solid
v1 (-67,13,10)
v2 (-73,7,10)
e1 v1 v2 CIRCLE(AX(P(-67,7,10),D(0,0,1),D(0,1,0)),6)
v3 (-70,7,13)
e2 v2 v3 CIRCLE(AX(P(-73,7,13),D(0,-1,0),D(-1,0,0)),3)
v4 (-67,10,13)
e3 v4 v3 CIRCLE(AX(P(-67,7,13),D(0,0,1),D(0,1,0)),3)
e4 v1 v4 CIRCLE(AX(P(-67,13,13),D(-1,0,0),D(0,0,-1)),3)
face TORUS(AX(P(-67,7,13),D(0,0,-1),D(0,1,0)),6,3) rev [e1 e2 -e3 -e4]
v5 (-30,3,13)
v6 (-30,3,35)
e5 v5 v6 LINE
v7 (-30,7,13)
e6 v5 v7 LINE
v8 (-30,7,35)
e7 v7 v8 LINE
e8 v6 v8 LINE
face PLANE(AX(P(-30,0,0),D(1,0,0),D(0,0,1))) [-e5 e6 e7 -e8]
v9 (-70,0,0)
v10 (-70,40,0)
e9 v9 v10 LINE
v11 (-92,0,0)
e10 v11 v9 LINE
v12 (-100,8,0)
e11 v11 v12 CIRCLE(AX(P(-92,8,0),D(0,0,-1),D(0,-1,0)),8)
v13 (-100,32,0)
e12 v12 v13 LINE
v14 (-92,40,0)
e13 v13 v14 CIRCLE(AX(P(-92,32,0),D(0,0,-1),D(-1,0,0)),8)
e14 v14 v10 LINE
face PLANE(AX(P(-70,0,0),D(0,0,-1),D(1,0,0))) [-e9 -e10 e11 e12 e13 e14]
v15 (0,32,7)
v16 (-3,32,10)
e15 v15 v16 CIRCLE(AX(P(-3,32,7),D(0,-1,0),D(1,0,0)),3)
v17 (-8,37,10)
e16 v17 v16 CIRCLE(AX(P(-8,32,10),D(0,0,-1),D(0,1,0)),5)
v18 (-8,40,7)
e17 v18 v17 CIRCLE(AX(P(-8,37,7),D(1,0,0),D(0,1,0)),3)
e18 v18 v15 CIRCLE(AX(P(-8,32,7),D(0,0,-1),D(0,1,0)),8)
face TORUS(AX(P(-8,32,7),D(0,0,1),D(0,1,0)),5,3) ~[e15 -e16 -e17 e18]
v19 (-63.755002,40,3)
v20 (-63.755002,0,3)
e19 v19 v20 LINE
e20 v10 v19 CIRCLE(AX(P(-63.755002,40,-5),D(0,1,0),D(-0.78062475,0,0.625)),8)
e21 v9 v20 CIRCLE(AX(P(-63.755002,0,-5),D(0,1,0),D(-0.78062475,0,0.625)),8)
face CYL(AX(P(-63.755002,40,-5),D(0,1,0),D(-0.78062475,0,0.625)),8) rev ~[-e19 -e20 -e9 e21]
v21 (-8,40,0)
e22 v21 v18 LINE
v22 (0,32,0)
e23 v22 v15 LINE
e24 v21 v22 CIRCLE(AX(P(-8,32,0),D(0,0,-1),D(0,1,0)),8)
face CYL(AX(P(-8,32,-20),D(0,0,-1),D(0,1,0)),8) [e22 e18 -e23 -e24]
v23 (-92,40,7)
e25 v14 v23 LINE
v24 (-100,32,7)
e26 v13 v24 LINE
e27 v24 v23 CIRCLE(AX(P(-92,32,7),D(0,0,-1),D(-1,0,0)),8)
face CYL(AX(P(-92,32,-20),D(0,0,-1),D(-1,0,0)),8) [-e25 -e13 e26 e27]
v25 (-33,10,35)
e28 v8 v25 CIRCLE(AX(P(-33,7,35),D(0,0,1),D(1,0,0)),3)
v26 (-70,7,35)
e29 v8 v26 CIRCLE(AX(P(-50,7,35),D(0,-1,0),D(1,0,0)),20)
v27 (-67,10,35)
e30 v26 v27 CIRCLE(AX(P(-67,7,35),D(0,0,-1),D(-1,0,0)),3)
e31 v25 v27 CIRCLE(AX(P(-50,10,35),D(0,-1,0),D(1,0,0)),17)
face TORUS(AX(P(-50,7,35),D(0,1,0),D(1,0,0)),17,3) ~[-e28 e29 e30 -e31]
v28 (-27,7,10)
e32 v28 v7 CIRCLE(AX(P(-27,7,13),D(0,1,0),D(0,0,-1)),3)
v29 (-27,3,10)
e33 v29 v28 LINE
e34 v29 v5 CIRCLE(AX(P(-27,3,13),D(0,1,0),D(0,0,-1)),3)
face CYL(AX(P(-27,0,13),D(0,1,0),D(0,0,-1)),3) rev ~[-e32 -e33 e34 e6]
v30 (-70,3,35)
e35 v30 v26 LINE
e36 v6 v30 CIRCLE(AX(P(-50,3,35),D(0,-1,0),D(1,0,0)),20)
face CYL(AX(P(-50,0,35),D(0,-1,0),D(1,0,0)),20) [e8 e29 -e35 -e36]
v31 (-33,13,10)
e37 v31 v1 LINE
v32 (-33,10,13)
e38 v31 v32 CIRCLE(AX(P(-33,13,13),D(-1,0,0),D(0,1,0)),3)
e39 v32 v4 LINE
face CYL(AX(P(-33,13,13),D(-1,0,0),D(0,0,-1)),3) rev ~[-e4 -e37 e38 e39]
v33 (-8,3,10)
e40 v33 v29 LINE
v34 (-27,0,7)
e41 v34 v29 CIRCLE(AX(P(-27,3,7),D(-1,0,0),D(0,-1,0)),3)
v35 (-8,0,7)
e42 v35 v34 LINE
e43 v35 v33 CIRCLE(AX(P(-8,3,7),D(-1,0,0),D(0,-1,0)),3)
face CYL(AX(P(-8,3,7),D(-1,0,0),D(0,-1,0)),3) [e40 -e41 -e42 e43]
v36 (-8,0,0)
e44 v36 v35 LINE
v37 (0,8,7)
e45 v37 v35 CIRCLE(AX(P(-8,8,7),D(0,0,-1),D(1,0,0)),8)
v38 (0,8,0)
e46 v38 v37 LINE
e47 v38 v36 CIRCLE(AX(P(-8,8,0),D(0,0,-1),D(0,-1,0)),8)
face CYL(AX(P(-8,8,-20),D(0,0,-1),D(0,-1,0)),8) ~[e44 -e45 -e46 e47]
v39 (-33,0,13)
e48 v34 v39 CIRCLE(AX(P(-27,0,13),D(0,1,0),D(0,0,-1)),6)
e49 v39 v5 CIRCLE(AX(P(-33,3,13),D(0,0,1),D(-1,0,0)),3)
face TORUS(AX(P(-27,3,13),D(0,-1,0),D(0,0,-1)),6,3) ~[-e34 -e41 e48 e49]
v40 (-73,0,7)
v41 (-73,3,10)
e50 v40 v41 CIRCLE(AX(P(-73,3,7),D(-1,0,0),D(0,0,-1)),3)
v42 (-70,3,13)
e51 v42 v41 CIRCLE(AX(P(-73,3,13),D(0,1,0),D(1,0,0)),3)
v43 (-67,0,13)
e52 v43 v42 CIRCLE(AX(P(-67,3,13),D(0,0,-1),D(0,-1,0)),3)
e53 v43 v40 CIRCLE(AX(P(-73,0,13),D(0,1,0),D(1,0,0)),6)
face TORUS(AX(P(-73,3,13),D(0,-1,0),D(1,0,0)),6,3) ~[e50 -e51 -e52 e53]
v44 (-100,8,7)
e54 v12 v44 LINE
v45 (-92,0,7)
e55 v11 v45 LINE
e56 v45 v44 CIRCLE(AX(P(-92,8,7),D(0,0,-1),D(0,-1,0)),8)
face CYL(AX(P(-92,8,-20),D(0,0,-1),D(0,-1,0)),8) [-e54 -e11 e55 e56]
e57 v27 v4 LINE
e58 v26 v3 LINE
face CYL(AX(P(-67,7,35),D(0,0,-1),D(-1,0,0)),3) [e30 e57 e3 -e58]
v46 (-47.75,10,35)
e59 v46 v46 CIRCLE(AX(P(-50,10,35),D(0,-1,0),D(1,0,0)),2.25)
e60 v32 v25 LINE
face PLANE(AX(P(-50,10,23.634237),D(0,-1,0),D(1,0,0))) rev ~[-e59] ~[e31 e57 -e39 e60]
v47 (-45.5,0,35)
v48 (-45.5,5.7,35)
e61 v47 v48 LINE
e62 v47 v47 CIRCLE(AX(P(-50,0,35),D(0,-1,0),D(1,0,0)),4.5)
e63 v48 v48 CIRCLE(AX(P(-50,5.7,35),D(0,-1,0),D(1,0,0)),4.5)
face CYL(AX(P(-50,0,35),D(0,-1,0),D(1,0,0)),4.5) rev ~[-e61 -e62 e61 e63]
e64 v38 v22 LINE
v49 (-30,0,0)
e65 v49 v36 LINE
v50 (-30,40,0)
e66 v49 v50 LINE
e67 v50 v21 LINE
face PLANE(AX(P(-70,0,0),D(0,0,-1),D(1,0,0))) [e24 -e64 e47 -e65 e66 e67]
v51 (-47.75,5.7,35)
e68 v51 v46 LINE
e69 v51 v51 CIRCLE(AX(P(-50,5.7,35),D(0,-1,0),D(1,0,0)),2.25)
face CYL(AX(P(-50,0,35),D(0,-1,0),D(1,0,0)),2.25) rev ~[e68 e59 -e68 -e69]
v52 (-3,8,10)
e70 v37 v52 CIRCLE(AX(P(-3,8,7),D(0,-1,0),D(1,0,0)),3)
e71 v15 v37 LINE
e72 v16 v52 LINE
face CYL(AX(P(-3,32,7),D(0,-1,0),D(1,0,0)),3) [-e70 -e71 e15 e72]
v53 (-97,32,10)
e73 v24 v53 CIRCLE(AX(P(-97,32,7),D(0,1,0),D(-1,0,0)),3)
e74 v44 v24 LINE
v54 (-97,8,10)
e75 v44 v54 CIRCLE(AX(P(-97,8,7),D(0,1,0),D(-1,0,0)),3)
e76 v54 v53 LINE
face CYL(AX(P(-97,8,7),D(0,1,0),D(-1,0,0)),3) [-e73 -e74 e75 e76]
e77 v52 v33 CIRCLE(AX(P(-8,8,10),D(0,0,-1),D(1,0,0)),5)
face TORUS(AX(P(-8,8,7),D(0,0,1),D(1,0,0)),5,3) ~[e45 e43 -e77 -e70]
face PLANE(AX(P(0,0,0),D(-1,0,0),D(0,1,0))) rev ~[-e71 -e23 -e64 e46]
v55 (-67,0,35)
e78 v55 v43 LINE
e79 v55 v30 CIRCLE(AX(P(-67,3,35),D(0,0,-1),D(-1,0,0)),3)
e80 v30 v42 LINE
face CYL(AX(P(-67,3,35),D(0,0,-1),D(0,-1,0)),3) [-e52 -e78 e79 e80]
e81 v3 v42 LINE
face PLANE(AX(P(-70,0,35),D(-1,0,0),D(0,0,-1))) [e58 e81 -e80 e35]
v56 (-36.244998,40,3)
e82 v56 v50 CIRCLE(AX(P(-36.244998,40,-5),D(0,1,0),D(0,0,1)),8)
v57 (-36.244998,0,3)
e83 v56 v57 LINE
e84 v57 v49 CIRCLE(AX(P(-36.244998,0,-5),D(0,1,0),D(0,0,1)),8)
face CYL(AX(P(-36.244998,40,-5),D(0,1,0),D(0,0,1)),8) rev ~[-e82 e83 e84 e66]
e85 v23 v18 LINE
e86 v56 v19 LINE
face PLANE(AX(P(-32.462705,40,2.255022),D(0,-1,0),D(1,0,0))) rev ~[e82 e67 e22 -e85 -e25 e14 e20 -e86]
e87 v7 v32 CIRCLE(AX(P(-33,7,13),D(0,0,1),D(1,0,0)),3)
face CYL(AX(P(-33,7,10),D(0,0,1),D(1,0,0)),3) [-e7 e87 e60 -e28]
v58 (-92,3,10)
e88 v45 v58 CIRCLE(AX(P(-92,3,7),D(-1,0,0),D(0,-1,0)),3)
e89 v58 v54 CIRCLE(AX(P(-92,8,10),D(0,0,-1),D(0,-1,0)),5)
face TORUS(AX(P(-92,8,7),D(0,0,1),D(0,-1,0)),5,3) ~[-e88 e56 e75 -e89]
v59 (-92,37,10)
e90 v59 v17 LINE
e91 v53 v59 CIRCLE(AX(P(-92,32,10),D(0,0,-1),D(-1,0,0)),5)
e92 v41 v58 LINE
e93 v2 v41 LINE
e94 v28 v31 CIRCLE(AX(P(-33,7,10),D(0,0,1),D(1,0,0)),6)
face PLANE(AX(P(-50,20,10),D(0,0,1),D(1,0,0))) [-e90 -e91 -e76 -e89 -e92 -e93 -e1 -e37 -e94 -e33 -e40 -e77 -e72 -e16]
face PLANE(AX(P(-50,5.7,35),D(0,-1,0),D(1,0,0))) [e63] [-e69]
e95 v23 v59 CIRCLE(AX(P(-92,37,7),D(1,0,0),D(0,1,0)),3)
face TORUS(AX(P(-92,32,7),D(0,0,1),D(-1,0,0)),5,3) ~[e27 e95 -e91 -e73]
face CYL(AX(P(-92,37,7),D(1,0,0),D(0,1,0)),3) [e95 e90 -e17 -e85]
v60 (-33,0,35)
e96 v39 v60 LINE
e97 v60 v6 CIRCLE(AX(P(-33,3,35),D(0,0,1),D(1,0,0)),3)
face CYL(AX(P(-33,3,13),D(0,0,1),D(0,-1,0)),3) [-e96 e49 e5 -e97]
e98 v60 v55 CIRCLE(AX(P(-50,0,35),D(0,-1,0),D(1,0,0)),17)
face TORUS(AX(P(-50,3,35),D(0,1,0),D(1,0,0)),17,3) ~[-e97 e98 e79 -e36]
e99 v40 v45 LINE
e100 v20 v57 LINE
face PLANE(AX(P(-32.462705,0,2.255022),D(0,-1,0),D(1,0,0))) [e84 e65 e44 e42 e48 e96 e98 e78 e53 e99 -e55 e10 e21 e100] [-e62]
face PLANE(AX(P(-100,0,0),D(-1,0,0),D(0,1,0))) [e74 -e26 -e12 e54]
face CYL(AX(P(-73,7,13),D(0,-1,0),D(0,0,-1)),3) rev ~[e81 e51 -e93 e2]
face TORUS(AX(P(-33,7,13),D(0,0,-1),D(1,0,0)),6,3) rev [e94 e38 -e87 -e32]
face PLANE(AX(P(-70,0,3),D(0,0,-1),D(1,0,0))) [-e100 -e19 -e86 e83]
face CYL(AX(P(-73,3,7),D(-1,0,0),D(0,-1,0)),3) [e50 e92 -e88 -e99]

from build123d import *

# Parameters (mm, degrees)
F0_W          = 100
F0_H          = 40
F1_DEPTH      = 10
F3_DEPTH      = 10
F4_W          = 40
F4_H          = 3
F5_DEPTH      = 40.001
F6_R          = 2.25
F7_DEPTH      = 5.7
F8_R          = 2.25
F9_DEPTH      = 40.001
F10_R         = 4.5
F11_DEPTH     = 5.7
F12_T1_DEPTH  = 40
F12_T3_DEPTH  = 40
F12_T5_DEPTH  = 50
F12_T7_DEPTH  = 50
F12_T9_DEPTH  = 50
F12_T11_DEPTH = 50
F13_F1_R      = 3
F13_F2_R      = 3
F13_F3_R      = 3
F14_R         = 14.7416379335
F15_DEPTH     = 10
F16_R         = 5
F17_R         = 4.99999
F19_DEPTH     = 25
F21_DEPTH     = 25
F23_DEPTH     = 25


# Not quite as in the source:
# - a fillet or chamfer that OpenCascade refuses, or shapes differently, is made with other operations: its cross-section is extruded or revolved along the edge and cut away or added
# - a fillet or chamfer is up to 0.001 mm smaller than in the source, because OpenCascade refuses the exact size


with BuildPart() as f1:
    # F0 (on Top) → F1 (new body)
    with BuildSketch(Plane.XY):
        with Locations((-50, 20)):
            Rectangle(F0_W, F0_H)
    extrude(amount=F1_DEPTH)

    # F2 (on Front) → F3 (join)
    with BuildSketch(Plane.XZ):
        with BuildLine():
            Line((-70, 35), (-70, 0))
            Line((-70, 0), (-30, 0))
            Line((-30, 0), (-30, 35))
            ThreePointArc((-30, 35), (-50, 55), (-70, 35))
        make_face()
    extrude(amount=-F3_DEPTH)

    # F4 (on face) → F5 (cut, through all)
    with BuildSketch(Plane.XZ):
        with Locations((-50, 1.5)):
            Rectangle(F4_W, F4_H)
    extrude(amount=-F5_DEPTH, mode=Mode.SUBTRACT)

    # F6 (on face) → F7 (cut)
    with BuildSketch(Plane.XZ):
        with Locations((-50, 35)):
            Circle(F6_R)
    extrude(amount=F7_DEPTH, mode=Mode.SUBTRACT)

    # F8 (on face) → F9 (cut, through all)
    with BuildSketch(Plane.XZ):
        with Locations((-50, 35)):
            Circle(F8_R)
    extrude(amount=-F9_DEPTH, mode=Mode.SUBTRACT)

    # F10 (on face) → F11 (cut)
    with BuildSketch(Plane.XZ):
        with Locations((-50, 35)):
            Circle(F10_R)
    extrude(amount=-F11_DEPTH, mode=Mode.SUBTRACT)

    # F12: fillet of radius 8 on 6 edges, made by hand

    # F12_s2 → F12_t1 (join)
    with BuildSketch(Plane.XZ.offset(-40)):
        with BuildLine():
            ThreePointArc((-70, 0), (-67.2191036167, 2.2111025509), (-63.7550020016, 3))
            Line((-63.7550020016, 3), (-70, 3))
            Line((-70, 3), (-70, 0))
        make_face()
    extrude(amount=F12_T1_DEPTH)

    # F12_s4 → F12_t3 (join)
    with BuildSketch(Plane.XZ.offset(-40)):
        with BuildLine():
            ThreePointArc((-36.2449979984, 3), (-32.7808963833, 2.2111025509), (-30, 0))
            Line((-30, 0), (-30, 3))
            Line((-30, 3), (-36.2449979984, 3))
        make_face()
    extrude(amount=F12_T3_DEPTH)

    # F12_s6 → F12_t5 (cut)
    with BuildSketch(Plane.XY.offset(-20)):
        with BuildLine():
            ThreePointArc((-92, 0), (-97.6568542495, 2.3431457505), (-100, 8))
            Line((-100, 8), (-100, 0))
            Line((-100, 0), (-92, 0))
        make_face()
    extrude(amount=F12_T5_DEPTH, mode=Mode.SUBTRACT)

    # F12_s8 → F12_t7 (cut)
    with BuildSketch(Plane.XY.offset(-20)):
        with BuildLine():
            ThreePointArc((-8, 0), (-2.3431457505, 2.3431457505), (0, 8))
            Line((0, 8), (0, 0))
            Line((0, 0), (-8, 0))
        make_face()
    extrude(amount=F12_T7_DEPTH, mode=Mode.SUBTRACT)

    # F12_s10 → F12_t9 (cut)
    with BuildSketch(Plane.XY.offset(-20)):
        with BuildLine():
            ThreePointArc((-100, 32), (-97.6568542495, 37.6568542495), (-92, 40))
            Line((-92, 40), (-100, 40))
            Line((-100, 40), (-100, 32))
        make_face()
    extrude(amount=F12_T9_DEPTH, mode=Mode.SUBTRACT)

    # F12_s12 → F12_t11 (cut)
    with BuildSketch(Plane.XY.offset(-20)):
        with BuildLine():
            ThreePointArc((-8, 40), (-2.3431457505, 37.6568542495), (0, 32))
            Line((0, 32), (0, 40))
            Line((0, 40), (-8, 40))
        make_face()
    extrude(amount=F12_T11_DEPTH, mode=Mode.SUBTRACT)

    # F13: fillet of radius 3 on 19 edges, made by hand

    # F13_f1
    f13_f1_edges = [f1.edges().sort_by_distance(p)[0] for p in [
        (-50, 10, 55),
        (-30, 10, 22.5),
        (-70, 10, 22.5),
    ]]
    fillet(f13_f1_edges, radius=F13_F1_R)

    # F13_f2
    f13_f2_edges = [f1.edges().sort_by_distance(p)[0] for p in [
        (-30, 3.5, 10),
        (-50, 10, 10),
        (-69.1213203436, 9.1213203436, 10),
        (-30.8786796564, 9.1213203436, 10),
    ]]
    fillet(f13_f2_edges, radius=F13_F2_R)

    # F13_f3
    f13_f3_edges = [f1.edges().sort_by_distance(p)[0] for p in [
        (-50, 0, 55),
        (-17.5, 0, 10),
        (-30, 0, 24),
        (-70, 0, 24),
        (-82.5, 0, 10),
        (-2.3431457505, 2.3431457505, 10),
        (-97.6568542495, 2.3431457505, 10),
        (-100, 20, 10),
        (-97.6568542495, 37.6568542495, 10),
        (-50, 40, 10),
        (-2.3431457505, 37.6568542495, 10),
        (0, 20, 10),
        (-70.8786796564, 0, 10.8786796564),
        (-29.1213203436, 0, 10.8786796564),
    ]]
    fillet(f13_f3_edges, radius=F13_F3_R)


with BuildPart() as f15:
    # F14 (on Front) → F15 (new body)
    with BuildSketch(Plane.XZ):
        with Locations((13.6165842414, 30.4193142802)):
            Circle(F14_R)
    extrude(amount=F15_DEPTH)

    # F16
    f16_edges = [f15.edges().sort_by_distance(p)[0] for p in [
        (-1.125054, 0, 30.419314),
    ]]
    fillet(f16_edges, radius=F16_R)

    # F17 (radius 5 in the source; OpenCascade refuses exactly that, so slightly less here)
    f17_edges = [f15.edges().sort_by_distance(p)[0] for p in [
        (-1.125054, -10, 30.419314),
    ]]
    fillet(f17_edges, radius=F17_R)

    # F18 (on face) → F19 (cut)
    with BuildSketch(Plane(origin=(0, 0, 0), x_dir=(-1, 0, 0), z_dir=(0, 1, 0))):
        with BuildLine():
            add(Edge.make_bspline(
                [(-19.4401461631, 32.8323282301), (-19.9968709509, 33.2770508944), (-19.4875302189, 34.8962578968), (-18.1048562016, 35.5958145992), (-15.3783069075, 36.2560620537), (-15.8567536171, 32.5328810398), (-15.7555112506, 32.3441027388), (-18.6503721636, 32.2014412912), (-19.4401461631, 32.8323282301)],
                knots=[0, 0, 0, 0, 0.1670809127, 0.3308667094, 0.503547456, 0.7173756393, 0.7629777521, 1, 1, 1, 1], degree=3))
        make_face()
    extrude(amount=-F19_DEPTH, mode=Mode.SUBTRACT)

    # F20 (on face) → F21 (cut)
    with BuildSketch(Plane(origin=(0, 0, 0), x_dir=(-1, 0, 0), z_dir=(0, 1, 0))):
        with BuildLine():
            add(Edge.make_bspline(
                [(-19.2039739341, 28.8294907659), (-19.9554901329, 27.9470783872), (-15.441516591, 25.1571436159), (-11.3543379993, 24.1565995472), (-3.9958502764, 30.6267965352), (-18.0118143302, 30.2292961108), (-19.2039739341, 28.8294907659)],
                knots=[0, 0, 0, 0, 0.2137062215, 0.4441739077, 0.6609894441, 1, 1, 1, 1], degree=3))
        make_face()
    extrude(amount=-F21_DEPTH, mode=Mode.SUBTRACT)

    # F22 (on face) → F23 (cut)
    with BuildSketch(Plane(origin=(0, 0, 0), x_dir=(-1, 0, 0), z_dir=(0, 1, 0))):
        with BuildLine():
            add(Edge.make_bspline(
                [(-11.5732420236, 32.4865654111), (-10.5787623693, 32.5525718403), (-7.6674853918, 31.6142853476), (-7.6892600681, 35.1157007314), (-12.2106904501, 36.948425314), (-13.1456057302, 31.8178145815), (-12.1437595998, 32.4486985449), (-11.5732420236, 32.4865654111)],
                knots=[0, 0, 0, 0, 0.2273765403, 0.4100675561, 0.6434669892, 0.8695576002, 1, 1, 1, 1], degree=3))
        make_face()
    extrude(amount=-F23_DEPTH, mode=Mode.SUBTRACT)


solid = f1.part
